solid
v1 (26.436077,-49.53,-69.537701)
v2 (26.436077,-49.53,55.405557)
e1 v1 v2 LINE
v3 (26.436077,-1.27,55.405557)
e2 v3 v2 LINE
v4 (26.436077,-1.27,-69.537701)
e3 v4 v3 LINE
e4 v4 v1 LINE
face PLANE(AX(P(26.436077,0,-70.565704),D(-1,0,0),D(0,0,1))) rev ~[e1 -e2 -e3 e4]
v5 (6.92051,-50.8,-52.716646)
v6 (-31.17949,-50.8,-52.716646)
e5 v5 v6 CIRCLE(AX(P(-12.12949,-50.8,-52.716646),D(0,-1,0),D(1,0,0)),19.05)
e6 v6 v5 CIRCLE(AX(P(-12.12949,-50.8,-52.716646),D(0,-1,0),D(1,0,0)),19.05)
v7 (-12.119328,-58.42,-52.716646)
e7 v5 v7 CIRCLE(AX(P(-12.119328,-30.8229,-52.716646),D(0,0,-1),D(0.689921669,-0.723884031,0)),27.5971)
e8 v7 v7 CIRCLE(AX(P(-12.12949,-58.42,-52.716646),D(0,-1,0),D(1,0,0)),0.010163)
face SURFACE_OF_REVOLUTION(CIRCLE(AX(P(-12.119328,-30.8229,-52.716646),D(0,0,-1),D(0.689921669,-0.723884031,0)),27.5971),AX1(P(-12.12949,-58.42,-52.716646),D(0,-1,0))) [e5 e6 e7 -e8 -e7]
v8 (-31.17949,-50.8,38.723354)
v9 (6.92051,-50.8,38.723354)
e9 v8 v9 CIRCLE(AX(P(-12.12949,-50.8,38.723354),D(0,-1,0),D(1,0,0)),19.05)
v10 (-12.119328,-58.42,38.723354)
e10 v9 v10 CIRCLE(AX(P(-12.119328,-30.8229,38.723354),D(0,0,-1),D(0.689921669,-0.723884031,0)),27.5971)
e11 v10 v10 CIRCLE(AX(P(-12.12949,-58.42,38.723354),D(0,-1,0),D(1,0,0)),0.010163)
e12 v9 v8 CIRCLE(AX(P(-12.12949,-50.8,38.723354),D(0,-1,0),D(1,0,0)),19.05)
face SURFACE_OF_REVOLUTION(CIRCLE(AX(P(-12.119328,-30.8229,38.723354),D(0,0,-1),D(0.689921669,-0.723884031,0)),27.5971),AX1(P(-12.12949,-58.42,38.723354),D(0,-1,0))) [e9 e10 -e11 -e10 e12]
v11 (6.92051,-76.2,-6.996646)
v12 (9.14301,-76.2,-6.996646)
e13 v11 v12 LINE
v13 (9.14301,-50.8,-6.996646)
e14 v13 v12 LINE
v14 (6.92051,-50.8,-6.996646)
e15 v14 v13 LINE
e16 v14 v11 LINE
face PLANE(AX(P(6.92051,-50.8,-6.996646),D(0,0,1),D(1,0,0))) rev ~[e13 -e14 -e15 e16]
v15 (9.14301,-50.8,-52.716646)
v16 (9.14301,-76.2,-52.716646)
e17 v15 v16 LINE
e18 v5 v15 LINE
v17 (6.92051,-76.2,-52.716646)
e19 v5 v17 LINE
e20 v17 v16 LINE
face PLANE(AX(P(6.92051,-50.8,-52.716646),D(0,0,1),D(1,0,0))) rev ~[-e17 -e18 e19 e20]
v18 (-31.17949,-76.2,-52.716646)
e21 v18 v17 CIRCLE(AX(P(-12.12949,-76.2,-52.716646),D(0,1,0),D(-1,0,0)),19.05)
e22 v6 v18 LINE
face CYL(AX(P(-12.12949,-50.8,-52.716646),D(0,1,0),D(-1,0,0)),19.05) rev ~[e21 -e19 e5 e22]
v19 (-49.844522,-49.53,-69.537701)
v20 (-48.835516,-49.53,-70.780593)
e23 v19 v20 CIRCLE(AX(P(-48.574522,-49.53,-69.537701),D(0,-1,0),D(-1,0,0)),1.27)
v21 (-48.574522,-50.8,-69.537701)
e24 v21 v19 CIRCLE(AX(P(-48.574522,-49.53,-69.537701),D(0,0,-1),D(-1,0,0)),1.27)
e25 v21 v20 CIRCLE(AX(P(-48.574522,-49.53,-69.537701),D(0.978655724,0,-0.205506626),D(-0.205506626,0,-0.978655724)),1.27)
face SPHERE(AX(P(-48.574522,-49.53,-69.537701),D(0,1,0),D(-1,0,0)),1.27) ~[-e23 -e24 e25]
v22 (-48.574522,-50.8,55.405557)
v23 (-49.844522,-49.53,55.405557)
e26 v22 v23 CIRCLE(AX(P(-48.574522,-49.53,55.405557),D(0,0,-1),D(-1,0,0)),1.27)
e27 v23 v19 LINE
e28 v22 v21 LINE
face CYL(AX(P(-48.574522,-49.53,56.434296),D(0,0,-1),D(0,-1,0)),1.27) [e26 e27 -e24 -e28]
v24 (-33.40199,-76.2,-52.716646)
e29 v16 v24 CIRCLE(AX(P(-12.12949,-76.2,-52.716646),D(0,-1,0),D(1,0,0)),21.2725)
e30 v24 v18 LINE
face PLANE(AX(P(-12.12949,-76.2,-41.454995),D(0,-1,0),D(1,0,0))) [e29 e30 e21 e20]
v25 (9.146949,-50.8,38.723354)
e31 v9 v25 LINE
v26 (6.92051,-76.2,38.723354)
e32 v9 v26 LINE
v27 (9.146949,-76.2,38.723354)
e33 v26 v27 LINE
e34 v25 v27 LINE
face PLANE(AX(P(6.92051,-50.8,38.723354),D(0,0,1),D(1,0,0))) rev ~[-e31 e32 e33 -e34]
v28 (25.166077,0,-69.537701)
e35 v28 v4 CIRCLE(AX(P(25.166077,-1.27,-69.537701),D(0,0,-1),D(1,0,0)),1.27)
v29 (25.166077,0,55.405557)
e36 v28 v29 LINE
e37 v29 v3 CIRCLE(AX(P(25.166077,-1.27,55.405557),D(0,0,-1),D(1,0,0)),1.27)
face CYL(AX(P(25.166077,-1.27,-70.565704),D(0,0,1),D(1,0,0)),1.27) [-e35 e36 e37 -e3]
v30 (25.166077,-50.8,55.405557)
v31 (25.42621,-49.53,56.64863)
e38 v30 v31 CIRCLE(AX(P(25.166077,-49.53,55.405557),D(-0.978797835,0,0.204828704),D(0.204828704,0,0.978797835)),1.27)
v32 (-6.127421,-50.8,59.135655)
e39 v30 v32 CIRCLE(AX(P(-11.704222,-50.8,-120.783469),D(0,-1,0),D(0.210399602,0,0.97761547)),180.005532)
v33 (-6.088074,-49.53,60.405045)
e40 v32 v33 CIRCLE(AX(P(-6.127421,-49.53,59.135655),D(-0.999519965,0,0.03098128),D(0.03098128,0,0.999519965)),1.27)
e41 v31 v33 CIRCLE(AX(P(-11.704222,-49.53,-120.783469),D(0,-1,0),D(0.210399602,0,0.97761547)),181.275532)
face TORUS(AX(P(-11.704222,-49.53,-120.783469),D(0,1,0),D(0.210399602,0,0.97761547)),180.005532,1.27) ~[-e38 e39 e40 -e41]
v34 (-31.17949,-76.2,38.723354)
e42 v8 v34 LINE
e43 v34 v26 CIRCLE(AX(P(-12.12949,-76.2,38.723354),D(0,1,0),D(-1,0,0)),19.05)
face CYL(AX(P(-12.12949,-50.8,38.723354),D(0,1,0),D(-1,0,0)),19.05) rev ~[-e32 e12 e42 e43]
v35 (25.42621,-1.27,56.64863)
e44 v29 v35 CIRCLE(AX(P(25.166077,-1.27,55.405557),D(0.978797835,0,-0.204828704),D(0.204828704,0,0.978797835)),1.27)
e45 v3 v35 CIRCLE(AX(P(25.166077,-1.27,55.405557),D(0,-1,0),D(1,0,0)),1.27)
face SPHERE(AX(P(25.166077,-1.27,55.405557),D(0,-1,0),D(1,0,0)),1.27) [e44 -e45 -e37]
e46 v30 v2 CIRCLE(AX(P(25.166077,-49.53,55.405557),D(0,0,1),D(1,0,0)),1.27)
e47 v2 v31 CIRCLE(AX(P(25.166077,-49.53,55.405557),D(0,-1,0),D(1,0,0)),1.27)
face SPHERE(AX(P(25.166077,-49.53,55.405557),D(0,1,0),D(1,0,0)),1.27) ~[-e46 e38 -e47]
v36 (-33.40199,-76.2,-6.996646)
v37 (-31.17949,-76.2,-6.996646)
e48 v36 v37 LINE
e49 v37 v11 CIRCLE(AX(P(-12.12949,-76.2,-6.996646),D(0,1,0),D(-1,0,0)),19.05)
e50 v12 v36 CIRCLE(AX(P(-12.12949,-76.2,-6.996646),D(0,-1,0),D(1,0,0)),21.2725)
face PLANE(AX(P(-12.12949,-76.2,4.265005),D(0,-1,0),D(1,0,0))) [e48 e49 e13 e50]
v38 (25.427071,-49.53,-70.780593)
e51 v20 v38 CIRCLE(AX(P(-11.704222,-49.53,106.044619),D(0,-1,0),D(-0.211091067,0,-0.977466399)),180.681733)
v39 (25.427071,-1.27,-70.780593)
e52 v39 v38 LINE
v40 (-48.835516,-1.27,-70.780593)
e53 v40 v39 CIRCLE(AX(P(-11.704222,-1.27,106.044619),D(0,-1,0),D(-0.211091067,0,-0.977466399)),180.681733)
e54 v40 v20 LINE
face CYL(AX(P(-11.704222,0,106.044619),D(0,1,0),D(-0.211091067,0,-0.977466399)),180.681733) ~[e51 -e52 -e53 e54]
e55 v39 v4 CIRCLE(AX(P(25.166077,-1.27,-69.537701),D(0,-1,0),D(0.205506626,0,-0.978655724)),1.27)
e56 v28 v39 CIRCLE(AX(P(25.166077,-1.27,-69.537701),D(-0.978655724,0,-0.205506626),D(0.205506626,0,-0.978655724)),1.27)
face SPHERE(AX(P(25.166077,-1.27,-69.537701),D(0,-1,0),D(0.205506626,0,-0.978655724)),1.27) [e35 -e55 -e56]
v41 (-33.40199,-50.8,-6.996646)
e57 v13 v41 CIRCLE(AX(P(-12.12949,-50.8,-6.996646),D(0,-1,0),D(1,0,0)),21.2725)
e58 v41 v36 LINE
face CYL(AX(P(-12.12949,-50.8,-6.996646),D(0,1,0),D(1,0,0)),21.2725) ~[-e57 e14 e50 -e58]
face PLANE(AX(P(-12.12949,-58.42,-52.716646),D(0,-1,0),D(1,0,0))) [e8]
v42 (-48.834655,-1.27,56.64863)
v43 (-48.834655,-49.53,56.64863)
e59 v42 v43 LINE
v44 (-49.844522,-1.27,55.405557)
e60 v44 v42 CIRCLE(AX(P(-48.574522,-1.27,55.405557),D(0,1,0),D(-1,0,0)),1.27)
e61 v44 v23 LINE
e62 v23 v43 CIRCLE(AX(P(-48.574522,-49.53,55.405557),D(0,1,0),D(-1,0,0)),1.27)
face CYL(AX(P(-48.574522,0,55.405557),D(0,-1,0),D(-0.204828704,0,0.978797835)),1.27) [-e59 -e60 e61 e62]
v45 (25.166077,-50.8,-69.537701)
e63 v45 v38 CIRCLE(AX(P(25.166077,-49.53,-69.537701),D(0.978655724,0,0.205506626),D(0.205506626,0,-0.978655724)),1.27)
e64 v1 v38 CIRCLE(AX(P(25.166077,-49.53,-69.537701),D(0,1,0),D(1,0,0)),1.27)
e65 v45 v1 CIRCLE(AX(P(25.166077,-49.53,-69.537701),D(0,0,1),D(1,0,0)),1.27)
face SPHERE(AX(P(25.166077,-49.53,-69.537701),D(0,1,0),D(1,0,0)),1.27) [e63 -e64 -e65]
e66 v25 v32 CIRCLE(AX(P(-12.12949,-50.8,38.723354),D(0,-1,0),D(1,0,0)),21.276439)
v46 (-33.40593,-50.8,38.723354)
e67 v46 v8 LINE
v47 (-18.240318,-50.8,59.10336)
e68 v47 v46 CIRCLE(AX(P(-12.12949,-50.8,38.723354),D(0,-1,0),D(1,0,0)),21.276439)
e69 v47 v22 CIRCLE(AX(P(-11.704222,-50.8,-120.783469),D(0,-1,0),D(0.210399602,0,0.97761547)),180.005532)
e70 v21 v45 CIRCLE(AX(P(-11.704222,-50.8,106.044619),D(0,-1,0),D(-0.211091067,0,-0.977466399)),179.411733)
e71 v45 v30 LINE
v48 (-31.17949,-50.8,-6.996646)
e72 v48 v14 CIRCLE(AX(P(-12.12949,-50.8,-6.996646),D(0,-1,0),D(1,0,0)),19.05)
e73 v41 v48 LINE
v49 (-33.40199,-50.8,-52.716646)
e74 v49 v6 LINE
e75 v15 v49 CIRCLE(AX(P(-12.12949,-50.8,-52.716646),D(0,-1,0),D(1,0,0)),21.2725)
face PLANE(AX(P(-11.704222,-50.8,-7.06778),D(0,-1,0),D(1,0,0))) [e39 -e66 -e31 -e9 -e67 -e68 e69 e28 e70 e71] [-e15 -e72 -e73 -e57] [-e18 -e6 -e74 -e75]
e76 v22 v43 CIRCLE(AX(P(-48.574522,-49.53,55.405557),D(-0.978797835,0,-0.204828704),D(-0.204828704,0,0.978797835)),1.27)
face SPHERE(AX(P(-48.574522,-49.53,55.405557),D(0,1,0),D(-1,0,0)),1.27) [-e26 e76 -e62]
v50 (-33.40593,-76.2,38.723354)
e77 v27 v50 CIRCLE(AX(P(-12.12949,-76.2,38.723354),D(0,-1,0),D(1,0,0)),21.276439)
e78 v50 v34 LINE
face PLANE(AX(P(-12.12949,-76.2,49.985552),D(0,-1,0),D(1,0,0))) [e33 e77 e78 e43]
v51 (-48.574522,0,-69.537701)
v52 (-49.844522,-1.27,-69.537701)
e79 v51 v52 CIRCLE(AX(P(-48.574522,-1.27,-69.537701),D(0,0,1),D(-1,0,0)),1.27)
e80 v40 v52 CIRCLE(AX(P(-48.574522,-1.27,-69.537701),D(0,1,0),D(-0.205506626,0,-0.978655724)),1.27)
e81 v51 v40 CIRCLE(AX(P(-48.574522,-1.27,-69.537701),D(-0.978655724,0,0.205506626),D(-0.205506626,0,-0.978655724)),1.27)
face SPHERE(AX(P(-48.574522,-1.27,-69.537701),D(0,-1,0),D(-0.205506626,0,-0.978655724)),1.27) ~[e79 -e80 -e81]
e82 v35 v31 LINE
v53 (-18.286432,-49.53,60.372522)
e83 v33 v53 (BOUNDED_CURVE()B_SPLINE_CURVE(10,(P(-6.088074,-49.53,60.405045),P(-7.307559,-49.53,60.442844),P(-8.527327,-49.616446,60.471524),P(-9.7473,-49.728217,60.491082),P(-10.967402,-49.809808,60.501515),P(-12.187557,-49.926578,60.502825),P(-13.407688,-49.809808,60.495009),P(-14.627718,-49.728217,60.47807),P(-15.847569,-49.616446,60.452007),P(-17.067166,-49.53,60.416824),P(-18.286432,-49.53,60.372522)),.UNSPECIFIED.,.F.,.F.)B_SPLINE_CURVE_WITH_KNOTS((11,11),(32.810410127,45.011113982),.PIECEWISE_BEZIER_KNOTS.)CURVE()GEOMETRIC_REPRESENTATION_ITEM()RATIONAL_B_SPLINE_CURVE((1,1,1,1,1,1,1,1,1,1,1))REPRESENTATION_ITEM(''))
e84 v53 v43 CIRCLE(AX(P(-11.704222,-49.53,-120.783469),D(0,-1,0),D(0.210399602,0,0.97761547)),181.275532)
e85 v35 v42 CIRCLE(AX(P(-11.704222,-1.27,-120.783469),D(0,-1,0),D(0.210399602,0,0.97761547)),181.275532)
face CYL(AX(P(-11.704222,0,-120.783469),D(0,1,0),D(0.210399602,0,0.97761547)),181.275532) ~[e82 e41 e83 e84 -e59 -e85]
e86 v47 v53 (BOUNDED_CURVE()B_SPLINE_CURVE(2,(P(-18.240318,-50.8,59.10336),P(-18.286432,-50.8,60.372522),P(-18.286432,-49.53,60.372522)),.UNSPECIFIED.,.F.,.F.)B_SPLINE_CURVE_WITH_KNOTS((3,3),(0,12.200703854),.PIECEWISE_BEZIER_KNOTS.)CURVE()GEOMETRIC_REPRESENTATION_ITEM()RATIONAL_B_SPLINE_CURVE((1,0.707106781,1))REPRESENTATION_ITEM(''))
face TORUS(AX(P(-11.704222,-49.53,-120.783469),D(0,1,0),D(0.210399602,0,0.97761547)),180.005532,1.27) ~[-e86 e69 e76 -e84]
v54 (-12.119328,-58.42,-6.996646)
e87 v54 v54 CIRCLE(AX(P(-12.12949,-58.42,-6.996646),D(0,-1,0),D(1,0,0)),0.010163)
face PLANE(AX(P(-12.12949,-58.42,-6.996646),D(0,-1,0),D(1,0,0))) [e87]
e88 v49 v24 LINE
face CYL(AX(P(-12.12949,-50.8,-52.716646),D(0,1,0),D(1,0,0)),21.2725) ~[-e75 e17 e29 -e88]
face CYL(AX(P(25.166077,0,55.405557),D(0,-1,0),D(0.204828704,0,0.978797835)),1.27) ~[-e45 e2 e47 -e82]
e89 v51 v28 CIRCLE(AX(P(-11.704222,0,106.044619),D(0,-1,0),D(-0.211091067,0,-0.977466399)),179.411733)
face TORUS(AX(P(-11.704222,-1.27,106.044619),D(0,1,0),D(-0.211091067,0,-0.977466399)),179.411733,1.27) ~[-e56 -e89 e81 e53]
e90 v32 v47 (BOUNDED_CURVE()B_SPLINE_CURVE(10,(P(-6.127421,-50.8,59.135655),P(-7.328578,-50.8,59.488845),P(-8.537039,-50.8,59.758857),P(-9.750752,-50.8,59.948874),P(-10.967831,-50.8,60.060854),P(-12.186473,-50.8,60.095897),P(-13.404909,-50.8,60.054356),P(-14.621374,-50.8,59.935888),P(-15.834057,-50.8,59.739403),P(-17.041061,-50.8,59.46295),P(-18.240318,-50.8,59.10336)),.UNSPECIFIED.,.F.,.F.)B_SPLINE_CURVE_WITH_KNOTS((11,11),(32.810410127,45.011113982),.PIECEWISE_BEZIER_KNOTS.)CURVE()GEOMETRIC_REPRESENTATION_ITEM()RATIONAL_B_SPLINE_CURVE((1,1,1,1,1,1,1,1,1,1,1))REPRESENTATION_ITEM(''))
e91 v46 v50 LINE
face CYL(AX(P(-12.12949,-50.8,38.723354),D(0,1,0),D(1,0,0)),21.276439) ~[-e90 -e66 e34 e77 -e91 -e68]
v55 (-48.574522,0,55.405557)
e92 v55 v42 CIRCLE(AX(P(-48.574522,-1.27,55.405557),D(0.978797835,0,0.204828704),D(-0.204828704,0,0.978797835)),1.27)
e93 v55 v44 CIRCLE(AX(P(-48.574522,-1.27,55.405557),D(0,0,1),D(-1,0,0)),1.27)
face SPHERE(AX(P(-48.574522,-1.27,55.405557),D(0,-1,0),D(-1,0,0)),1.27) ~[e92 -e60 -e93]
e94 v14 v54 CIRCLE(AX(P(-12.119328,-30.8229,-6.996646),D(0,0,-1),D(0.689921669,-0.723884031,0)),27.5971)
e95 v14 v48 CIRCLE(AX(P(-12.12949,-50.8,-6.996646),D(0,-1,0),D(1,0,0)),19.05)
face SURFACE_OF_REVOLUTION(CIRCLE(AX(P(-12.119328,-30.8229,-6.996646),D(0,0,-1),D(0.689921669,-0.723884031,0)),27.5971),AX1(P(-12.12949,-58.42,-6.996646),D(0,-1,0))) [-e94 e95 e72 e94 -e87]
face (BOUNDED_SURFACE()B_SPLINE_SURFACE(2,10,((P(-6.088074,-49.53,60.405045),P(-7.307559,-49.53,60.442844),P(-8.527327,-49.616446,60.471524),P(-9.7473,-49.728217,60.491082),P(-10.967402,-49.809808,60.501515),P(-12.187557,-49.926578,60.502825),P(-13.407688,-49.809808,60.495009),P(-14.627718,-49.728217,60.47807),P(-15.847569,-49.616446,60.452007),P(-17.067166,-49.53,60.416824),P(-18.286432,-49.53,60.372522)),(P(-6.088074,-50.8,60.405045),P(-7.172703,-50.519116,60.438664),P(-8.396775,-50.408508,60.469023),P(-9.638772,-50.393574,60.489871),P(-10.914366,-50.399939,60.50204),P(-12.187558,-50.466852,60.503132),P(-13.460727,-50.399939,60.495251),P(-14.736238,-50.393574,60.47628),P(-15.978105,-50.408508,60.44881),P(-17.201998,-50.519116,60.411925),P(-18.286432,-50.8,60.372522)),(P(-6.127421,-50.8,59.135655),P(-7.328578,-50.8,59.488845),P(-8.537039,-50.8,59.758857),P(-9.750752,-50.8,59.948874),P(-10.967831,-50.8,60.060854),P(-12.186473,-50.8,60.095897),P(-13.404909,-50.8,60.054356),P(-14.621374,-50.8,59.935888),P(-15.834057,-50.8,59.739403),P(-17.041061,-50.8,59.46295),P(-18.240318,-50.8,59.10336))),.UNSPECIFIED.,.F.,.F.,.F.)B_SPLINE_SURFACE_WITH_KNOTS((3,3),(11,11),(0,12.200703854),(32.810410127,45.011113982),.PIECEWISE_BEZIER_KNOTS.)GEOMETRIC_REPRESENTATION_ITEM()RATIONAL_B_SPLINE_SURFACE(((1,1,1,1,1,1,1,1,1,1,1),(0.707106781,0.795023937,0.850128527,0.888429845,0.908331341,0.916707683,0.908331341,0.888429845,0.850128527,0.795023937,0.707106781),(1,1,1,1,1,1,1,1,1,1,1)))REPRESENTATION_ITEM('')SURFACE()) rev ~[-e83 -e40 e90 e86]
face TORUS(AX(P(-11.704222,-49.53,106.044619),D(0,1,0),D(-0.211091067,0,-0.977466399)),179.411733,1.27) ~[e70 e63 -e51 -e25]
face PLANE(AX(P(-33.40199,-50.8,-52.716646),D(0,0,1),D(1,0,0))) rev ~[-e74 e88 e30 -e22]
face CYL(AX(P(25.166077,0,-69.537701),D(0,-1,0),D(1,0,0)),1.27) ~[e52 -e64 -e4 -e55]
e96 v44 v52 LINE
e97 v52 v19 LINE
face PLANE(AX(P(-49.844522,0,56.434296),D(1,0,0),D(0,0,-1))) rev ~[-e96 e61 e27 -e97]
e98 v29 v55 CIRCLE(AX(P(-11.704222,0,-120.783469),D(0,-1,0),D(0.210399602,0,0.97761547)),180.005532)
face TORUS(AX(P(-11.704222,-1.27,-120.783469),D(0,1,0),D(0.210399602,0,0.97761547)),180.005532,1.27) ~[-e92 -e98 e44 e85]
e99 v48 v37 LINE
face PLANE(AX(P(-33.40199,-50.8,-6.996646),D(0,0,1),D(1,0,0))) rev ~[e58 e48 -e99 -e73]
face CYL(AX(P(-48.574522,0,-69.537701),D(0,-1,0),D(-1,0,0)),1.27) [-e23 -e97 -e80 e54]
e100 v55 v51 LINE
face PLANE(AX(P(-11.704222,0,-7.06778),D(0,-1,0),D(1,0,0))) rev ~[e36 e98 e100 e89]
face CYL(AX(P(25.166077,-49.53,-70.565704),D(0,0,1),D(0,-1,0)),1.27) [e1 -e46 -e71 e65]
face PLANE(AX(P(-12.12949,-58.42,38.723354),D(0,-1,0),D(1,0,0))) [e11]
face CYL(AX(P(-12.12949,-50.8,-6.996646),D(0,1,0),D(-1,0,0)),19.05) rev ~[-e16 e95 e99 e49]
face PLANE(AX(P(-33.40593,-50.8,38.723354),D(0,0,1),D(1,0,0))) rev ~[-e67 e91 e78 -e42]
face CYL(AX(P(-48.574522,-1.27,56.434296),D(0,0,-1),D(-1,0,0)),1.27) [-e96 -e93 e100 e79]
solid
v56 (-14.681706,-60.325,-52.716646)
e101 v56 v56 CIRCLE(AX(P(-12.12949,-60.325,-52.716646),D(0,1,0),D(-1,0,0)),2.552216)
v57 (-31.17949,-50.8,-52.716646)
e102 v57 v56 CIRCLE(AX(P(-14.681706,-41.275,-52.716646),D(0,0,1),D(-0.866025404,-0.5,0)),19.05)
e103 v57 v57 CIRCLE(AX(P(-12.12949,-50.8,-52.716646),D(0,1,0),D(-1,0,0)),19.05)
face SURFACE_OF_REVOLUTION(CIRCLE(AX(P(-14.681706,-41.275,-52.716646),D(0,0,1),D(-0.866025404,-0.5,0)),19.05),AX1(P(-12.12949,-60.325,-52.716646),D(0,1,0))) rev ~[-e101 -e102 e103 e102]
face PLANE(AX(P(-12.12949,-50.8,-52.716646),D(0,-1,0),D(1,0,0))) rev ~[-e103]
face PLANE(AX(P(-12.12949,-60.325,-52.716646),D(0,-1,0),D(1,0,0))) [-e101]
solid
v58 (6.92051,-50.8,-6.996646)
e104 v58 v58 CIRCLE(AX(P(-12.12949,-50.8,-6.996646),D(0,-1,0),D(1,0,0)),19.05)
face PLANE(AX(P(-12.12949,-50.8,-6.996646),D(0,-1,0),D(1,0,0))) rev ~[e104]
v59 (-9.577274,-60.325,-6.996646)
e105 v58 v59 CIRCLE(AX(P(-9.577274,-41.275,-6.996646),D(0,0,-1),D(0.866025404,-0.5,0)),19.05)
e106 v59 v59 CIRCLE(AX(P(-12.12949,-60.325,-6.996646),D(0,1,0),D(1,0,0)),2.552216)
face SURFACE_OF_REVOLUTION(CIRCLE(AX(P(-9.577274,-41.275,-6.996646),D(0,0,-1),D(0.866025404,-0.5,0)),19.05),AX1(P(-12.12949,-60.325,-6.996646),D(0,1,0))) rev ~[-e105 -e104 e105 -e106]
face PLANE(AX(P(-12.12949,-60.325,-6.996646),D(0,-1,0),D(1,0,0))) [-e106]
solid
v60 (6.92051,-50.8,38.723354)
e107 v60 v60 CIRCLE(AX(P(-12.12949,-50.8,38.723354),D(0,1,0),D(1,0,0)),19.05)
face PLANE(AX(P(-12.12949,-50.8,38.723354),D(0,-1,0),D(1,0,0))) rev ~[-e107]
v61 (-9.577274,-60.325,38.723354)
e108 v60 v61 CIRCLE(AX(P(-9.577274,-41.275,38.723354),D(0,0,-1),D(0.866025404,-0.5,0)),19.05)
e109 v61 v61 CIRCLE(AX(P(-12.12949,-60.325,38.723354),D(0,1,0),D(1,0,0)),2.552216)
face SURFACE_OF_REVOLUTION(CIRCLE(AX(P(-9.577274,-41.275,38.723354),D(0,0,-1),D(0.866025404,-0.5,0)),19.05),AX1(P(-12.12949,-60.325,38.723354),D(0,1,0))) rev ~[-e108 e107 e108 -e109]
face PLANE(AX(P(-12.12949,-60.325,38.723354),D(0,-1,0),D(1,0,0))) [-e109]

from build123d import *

# Parameters (mm, degrees)
F0_R     = 19.05
F1_DEPTH = 50.8
F2_DEPTH = 58.42
F5_DEPTH = 25.4
F6_R     = 1.27
F8_DEPTH = 9.525


# Not quite as in the source:
# - a fillet or chamfer that OpenCascade refuses, or shapes differently, is made with other operations: its cross-section is extruded or revolved along the edge and cut away or added


with BuildPart() as f1:
    # F0 (on Front) → F1 (new body)
    with BuildSketch(Plane.XZ):
        with BuildLine():
            ThreePointArc((26.4360774308, 56.4342959829), (-11.7042224138, 60.4920635507), (-49.8445222585, 56.4342959829))
            Line((-49.8445222585, 56.4342959829), (-49.8445222585, -70.5657040171))
            ThreePointArc((-49.8445222585, -70.5657040171), (-11.7042224138, -74.6371140825), (26.4360774308, -70.5657040171))
            Line((26.4360774308, -70.5657040171), (26.4360774308, 56.4342959829))
        make_face()
        with Locations((-12.1294902638, -52.7166463435)):
            Circle(F0_R, mode=Mode.SUBTRACT)
        with Locations((-12.1294902638, -6.9966463435)):
            Circle(F0_R, mode=Mode.SUBTRACT)
        with Locations((-12.1294902638, 38.7233536565)):
            Circle(F0_R, mode=Mode.SUBTRACT)
    extrude(amount=F1_DEPTH)

    # F0 (on Front) → F2 (join)
    with BuildSketch(Plane.XZ):
        with Locations((-12.1294902638, 38.7233536565)):
            Circle(F0_R)
        with Locations((-12.1294902638, -6.9966463435)):
            Circle(F0_R)
        with Locations((-12.1294902638, -52.7166463435)):
            Circle(F0_R)
    extrude(amount=F2_DEPTH)

    # F3: fillet of radius 27.5971 on 3 edges, made by hand

    # F3_s1 → F3_t2 (revolve, cut)
    with BuildSketch(Plane.XY.offset(38.7233536565)):
        with BuildLine():
            ThreePointArc((6.9205097362, -50.8), (-1.8653063418, -56.4442773519), (-12.119327553, -58.42))
            Line((-12.119327553, -58.42), (6.9205097362, -58.42))
            Line((6.9205097362, -58.42), (6.9205097362, -50.8))
        make_face()
    revolve(axis=Axis((-12.1294902638, -58.42, 38.7233536565), (0, -1, 0)), mode=Mode.SUBTRACT)

    # F3_s3 → F3_t4 (revolve, cut)
    with BuildSketch(Plane.XY.offset(-6.9966463435)):
        with BuildLine():
            ThreePointArc((6.9205097362, -50.8), (-1.8653063418, -56.4442773519), (-12.119327553, -58.42))
            Line((-12.119327553, -58.42), (6.9205097362, -58.42))
            Line((6.9205097362, -58.42), (6.9205097362, -50.8))
        make_face()
    revolve(axis=Axis((-12.1294902638, -58.42, -6.9966463435), (0, -1, 0)), mode=Mode.SUBTRACT)

    # F3_s5 → F3_t6 (revolve, cut)
    with BuildSketch(Plane.XY.offset(-52.7166463435)):
        with BuildLine():
            ThreePointArc((6.9205097362, -50.8), (-1.8653063418, -56.4442773519), (-12.119327553, -58.42))
            Line((-12.119327553, -58.42), (6.9205097362, -58.42))
            Line((6.9205097362, -58.42), (6.9205097362, -50.8))
        make_face()
    revolve(axis=Axis((-12.1294902638, -58.42, -52.7166463435), (0, -1, 0)), mode=Mode.SUBTRACT)

    # F4 (on face) → F5 (join)
    with BuildSketch(Plane.XZ.offset(50.8)):
        with BuildLine():
            ThreePointArc((-31.1794902638, 38.7233536565), (-12.1294902638, 57.7733536565), (6.9205097362, 38.7233536565))
            Line((6.9205097362, 38.7233536565), (9.1469490083, 38.7233536565))
            ThreePointArc((9.1469490083, 38.7233536565), (-12.1294902638, 59.9997929286), (-33.4059295358, 38.7233536565))
            Line((-33.4059295358, 38.7233536565), (-31.1794902638, 38.7233536565))
        make_face()
        with BuildLine():
            Line((6.9205097362, -6.9966463435), (9.1430097362, -6.9966463435))
            ThreePointArc((9.1430097362, -6.9966463435), (-12.1294902638, 14.2758536565), (-33.4019902638, -6.9966463435))
            Line((-33.4019902638, -6.9966463435), (-31.1794902638, -6.9966463435))
            ThreePointArc((-31.1794902638, -6.9966463435), (-12.1294902638, 12.0533536565), (6.9205097362, -6.9966463435))
        make_face()
        with BuildLine():
            Line((6.9205097362, -52.7166463435), (9.1430097362, -52.7166463435))
            ThreePointArc((9.1430097362, -52.7166463435), (-12.1294902638, -31.4441463435), (-33.4019902638, -52.7166463435))
            Line((-33.4019902638, -52.7166463435), (-31.1794902638, -52.7166463435))
            ThreePointArc((-31.1794902638, -52.7166463435), (-12.1294902638, -33.6666463435), (6.9205097362, -52.7166463435))
        make_face()
    extrude(amount=F5_DEPTH)

    # F6
    f6_edges = [f1.edges().sort_by_distance(p)[0] for p in [
        (26.436077, -50.8, -7.065704),
        (-11.704222, -50.8, -74.637114),
        (26.436077, -25.4, -70.565704),
        (-49.844522, -25.4, -70.565704),
        (-11.704222, 0, -74.637114),
        (26.436077, 0, -7.065704),
        (-49.844522, -50.8, -7.065704),
        (-49.844522, 0, -7.065704),
        (-11.704222, -50.8, 60.492064),
        (-11.704222, 0, 60.492064),
        (-49.844522, -25.4, 56.434296),
        (26.436077, -25.4, 56.434296),
    ]]
    fillet(f6_edges, radius=F6_R)


with BuildPart() as f8:
    # F7 (on face) → F8 (new body)
    with BuildSketch(Plane.XZ.offset(50.8)):
        with BuildLine():
            ThreePointArc((6.9205097362, 38.7233536565), (-12.1294902638, 57.7733536565), (-31.1794902638, 38.7233536565))
            ThreePointArc((-31.1794902638, 38.7233536565), (-12.1294902638, 19.6733536565), (6.9205097362, 38.7233536565))
        make_face()
    extrude(amount=F8_DEPTH)

    # F9: fillet of radius 19.05 on 1 edges, made by hand

    # F9_s1 → F9_t2 (revolve, cut)
    with BuildSketch(Plane.XY.offset(38.7233536565)):
        with BuildLine():
            ThreePointArc((6.9205097362, -50.8), (-0.0522742059, -57.7727839421), (-9.5772742059, -60.325))
            Line((-9.5772742059, -60.325), (6.9205097362, -60.325))
            Line((6.9205097362, -60.325), (6.9205097362, -50.8))
        make_face()
    revolve(axis=Axis((-12.1294902638, -60.325, 38.7233536565), (0, 1, 0)), mode=Mode.SUBTRACT)


with BuildPart() as f8b:
    # F7 (on face) → F8, piece 2 (new body)
    with BuildSketch(Plane.XZ.offset(50.8)):
        with BuildLine():
            ThreePointArc((-31.1794902638, -6.9966463435), (-12.1294902638, -26.0466463435), (6.9205097362, -6.9966463435))
            ThreePointArc((6.9205097362, -6.9966463435), (-12.1294902638, 12.0533536565), (-31.1794902638, -6.9966463435))
        make_face()
    extrude(amount=F8_DEPTH)

    # F9#2: fillet of radius 19.05 on 1 edges, made by hand

    # F9_2_s1 → F9_2_t2 (revolve, cut)
    with BuildSketch(Plane.XY.offset(-6.9966463435)):
        with BuildLine():
            ThreePointArc((6.9205097362, -50.8), (-0.0522742059, -57.7727839421), (-9.5772742059, -60.325))
            Line((-9.5772742059, -60.325), (6.9205097362, -60.325))
            Line((6.9205097362, -60.325), (6.9205097362, -50.8))
        make_face()
    revolve(axis=Axis((-12.1294902638, -60.325, -6.9966463435), (0, 1, 0)), mode=Mode.SUBTRACT)


with BuildPart() as f8c:
    # F7 (on face) → F8, piece 3 (new body)
    with BuildSketch(Plane.XZ.offset(50.8)):
        with BuildLine():
            ThreePointArc((-31.1794902638, -52.7166463435), (-12.1294902638, -71.7666463435), (6.9205097362, -52.7166463435))
            ThreePointArc((6.9205097362, -52.7166463435), (-12.1294902638, -33.6666463435), (-31.1794902638, -52.7166463435))
        make_face()
    extrude(amount=F8_DEPTH)

    # F9#3: fillet of radius 19.05 on 1 edges, made by hand

    # F9_3_s1 → F9_3_t2 (revolve, cut)
    with BuildSketch(Plane.XY.offset(-52.7166463435)):
        with BuildLine():
            ThreePointArc((-31.1794902638, -50.8), (-24.2067063217, -57.7727839421), (-14.6817063217, -60.325))
            Line((-14.6817063217, -60.325), (-31.1794902638, -60.325))
            Line((-31.1794902638, -60.325), (-31.1794902638, -50.8))
        make_face()
    revolve(axis=Axis((-12.1294902638, -60.325, -52.7166463435), (0, 1, 0)), mode=Mode.SUBTRACT)


solid = Compound([f1.part, f8.part, f8b.part, f8c.part])
